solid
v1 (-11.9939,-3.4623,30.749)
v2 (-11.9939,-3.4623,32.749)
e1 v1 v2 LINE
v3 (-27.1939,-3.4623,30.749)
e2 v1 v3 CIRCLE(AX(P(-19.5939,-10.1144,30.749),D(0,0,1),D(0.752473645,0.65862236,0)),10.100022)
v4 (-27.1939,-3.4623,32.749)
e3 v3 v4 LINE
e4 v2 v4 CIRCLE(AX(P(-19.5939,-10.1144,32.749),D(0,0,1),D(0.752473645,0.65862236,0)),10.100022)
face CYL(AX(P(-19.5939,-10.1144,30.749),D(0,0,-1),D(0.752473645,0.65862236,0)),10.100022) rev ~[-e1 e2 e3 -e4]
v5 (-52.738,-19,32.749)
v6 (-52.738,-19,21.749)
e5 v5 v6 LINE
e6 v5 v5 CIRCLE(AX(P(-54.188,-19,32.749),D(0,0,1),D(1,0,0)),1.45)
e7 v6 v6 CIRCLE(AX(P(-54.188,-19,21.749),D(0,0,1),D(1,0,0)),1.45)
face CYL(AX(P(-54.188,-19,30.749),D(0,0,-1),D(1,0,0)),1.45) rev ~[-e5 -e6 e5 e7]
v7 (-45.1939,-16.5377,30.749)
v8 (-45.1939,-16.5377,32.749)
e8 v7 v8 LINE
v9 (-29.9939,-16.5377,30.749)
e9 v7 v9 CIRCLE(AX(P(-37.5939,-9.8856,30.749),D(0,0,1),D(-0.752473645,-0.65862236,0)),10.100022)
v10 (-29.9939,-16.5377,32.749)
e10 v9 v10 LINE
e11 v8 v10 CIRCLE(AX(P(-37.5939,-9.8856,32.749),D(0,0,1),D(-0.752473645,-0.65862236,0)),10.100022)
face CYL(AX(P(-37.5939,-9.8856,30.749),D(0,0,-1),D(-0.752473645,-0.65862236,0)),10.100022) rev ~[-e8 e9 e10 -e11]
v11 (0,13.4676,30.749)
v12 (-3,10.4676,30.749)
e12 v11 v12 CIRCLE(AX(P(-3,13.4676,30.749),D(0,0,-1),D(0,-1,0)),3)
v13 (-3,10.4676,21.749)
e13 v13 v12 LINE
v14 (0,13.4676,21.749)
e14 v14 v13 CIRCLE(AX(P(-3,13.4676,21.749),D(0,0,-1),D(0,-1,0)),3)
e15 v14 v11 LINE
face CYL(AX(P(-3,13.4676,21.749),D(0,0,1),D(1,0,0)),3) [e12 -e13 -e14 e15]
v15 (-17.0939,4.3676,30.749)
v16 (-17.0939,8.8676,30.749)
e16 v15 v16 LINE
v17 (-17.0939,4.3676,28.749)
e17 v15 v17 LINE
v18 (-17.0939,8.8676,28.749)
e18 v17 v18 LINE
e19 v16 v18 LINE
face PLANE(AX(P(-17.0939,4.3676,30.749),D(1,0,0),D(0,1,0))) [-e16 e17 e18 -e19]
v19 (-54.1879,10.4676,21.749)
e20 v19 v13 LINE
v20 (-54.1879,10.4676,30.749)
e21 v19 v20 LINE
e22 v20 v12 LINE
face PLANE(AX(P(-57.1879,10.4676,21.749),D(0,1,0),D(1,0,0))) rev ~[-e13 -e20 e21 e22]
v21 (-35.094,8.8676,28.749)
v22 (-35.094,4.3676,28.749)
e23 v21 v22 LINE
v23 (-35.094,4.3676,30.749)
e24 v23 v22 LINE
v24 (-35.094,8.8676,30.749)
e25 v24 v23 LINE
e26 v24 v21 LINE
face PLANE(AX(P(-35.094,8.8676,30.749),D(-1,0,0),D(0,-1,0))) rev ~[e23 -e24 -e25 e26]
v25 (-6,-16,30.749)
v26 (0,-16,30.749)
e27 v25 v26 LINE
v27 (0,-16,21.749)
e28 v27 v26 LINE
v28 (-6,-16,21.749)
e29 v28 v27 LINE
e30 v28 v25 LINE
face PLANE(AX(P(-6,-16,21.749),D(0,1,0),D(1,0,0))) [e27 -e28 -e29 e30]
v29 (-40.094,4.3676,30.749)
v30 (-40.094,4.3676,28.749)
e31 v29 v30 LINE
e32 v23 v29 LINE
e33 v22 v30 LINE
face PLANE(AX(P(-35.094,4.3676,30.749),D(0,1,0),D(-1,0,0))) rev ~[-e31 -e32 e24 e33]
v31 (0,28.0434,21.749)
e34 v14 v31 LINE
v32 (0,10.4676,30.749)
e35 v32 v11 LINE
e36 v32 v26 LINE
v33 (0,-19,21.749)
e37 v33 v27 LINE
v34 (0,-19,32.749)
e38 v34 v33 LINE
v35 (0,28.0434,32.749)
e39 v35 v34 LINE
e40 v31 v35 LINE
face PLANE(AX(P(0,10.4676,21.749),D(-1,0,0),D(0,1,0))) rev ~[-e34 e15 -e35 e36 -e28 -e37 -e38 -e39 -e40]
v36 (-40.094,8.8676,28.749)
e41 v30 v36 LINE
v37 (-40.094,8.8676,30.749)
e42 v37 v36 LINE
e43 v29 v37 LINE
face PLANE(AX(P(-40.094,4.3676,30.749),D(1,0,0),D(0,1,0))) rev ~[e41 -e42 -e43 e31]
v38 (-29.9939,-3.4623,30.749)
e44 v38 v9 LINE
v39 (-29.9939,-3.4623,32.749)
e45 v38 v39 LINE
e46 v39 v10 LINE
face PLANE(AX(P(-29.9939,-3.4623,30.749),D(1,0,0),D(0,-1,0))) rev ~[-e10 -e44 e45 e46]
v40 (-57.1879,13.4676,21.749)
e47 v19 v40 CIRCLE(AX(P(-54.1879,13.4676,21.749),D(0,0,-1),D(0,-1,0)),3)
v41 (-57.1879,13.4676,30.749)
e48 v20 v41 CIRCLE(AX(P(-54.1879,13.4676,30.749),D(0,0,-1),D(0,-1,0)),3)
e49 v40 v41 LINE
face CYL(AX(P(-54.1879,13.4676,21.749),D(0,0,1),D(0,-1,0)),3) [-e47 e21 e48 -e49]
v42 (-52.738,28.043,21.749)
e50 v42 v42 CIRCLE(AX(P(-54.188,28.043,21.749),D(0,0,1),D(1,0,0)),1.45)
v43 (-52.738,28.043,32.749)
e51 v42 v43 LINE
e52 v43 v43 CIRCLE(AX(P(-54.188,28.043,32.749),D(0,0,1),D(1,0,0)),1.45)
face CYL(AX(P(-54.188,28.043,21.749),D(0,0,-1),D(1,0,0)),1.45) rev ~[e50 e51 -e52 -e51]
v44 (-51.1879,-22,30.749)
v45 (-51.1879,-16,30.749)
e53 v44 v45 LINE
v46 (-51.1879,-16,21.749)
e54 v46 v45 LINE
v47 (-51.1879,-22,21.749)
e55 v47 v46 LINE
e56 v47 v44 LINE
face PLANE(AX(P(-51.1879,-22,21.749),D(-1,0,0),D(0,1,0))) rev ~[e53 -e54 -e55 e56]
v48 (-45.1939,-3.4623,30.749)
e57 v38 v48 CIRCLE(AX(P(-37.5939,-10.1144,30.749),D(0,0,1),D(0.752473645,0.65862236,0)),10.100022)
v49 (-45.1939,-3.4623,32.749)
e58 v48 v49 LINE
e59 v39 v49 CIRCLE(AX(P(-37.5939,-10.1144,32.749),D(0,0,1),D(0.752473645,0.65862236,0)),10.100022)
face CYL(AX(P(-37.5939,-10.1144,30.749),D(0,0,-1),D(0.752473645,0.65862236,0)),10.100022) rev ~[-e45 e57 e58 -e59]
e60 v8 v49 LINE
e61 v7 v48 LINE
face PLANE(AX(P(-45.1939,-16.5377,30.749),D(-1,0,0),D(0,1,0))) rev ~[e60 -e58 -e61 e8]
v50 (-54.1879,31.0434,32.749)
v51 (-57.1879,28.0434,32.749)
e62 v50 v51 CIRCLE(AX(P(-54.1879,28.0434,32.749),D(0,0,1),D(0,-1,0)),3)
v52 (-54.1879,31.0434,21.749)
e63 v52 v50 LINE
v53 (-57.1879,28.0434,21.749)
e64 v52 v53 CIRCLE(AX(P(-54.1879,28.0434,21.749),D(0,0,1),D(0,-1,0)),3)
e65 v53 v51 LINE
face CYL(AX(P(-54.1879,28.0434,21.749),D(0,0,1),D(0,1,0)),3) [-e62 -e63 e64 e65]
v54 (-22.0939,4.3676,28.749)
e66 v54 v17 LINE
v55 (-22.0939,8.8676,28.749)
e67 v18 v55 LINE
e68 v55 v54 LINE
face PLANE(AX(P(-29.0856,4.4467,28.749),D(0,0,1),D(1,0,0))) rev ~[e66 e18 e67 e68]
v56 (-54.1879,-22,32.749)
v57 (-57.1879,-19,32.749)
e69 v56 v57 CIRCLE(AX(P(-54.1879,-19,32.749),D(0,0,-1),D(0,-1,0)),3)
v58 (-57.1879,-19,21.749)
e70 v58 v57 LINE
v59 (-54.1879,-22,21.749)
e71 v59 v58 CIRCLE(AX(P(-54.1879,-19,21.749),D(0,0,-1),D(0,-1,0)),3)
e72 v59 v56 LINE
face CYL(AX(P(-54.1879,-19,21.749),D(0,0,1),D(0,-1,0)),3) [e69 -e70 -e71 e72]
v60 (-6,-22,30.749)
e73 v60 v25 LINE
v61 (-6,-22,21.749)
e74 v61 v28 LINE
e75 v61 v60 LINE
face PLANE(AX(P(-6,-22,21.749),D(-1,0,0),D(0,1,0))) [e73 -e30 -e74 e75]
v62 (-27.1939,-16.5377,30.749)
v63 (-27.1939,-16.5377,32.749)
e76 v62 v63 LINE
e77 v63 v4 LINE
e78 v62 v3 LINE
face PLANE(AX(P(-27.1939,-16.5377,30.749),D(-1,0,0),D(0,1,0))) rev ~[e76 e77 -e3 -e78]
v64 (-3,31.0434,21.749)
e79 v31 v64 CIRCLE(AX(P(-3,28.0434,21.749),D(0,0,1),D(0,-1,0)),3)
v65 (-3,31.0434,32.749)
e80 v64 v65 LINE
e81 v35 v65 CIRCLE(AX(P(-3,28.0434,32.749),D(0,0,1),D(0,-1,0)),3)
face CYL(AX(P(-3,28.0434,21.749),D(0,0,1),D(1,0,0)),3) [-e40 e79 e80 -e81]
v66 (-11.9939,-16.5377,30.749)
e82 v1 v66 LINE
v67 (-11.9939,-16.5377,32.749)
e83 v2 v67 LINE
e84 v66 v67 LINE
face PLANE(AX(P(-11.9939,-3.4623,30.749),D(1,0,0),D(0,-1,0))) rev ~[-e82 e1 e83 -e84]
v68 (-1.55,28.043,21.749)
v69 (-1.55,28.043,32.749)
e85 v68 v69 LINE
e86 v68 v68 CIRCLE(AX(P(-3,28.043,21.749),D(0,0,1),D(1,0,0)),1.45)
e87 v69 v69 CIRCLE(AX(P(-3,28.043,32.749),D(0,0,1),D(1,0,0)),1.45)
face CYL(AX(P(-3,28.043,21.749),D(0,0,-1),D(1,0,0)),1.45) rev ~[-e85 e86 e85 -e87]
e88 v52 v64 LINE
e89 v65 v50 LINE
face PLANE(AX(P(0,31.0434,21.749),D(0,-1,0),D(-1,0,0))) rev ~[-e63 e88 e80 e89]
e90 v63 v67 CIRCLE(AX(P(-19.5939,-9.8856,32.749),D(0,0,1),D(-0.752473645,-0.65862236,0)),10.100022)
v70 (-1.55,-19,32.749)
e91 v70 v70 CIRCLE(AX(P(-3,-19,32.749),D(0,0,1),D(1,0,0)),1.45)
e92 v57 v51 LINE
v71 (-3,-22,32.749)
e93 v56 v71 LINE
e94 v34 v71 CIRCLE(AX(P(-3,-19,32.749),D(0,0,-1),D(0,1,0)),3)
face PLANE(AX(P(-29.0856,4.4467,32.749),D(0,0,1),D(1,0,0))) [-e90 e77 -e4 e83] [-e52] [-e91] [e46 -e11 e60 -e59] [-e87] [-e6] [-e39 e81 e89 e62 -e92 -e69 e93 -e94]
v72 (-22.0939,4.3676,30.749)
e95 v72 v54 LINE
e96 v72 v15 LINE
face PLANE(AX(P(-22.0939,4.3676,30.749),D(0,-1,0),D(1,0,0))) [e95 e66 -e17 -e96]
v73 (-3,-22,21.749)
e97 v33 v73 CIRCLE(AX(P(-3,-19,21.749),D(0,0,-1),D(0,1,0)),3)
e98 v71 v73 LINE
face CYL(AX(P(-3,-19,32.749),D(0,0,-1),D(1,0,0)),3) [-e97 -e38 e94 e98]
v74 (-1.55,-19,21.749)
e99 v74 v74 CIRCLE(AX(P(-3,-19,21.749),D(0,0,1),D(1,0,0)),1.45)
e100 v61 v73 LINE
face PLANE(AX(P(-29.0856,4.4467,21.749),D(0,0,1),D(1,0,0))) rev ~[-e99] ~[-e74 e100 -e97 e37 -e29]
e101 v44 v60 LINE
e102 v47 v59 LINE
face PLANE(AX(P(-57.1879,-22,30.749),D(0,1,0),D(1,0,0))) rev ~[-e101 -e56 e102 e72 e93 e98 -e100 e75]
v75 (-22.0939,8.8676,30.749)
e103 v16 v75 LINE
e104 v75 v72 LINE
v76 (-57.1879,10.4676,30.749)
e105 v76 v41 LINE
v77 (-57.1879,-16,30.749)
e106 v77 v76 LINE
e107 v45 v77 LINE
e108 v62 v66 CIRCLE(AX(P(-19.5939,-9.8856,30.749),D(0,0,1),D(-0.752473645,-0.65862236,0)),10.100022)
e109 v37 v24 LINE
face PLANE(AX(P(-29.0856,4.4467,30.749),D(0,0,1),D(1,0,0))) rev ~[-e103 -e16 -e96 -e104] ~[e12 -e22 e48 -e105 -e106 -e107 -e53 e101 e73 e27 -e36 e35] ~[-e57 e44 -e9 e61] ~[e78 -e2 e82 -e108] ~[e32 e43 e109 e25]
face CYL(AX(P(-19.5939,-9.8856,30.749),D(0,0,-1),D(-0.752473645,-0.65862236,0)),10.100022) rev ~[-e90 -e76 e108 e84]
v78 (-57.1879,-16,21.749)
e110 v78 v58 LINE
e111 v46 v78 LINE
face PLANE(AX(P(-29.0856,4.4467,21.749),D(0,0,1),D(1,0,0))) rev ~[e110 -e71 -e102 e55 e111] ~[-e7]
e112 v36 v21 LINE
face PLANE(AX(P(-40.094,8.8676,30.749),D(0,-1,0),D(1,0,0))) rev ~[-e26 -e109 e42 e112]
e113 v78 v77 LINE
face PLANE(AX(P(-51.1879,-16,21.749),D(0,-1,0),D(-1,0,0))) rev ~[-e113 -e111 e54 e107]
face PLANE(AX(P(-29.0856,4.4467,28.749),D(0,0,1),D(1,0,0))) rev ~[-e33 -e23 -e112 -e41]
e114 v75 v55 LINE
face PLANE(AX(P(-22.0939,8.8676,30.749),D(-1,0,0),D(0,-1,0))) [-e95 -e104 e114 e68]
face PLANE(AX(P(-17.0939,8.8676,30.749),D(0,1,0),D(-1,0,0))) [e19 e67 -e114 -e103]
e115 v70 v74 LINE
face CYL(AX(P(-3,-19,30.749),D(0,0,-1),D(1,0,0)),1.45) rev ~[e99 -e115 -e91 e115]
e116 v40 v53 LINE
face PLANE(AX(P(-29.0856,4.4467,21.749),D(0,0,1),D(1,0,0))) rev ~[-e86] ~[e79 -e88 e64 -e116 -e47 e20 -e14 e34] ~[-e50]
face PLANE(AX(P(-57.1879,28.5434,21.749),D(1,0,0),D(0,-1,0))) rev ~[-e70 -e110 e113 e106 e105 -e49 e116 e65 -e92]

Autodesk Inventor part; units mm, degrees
ref_plane "YZ Plane" through (0, 0, 0) normal (1, 0, 0) x (0, 1, 0)
ref_plane "XZ Plane" through (0, 0, 0) normal (0, 1, 0) x (-1, 0, 0)
ref_plane "Work Plane1" through (-29.0856, 4.4467, 21.749) normal (0, 0, 1) x (1, 0, 0)
ref_plane "Work Plane2" through (-5, -17, 36.649) normal (0, 0, -1) x (1, 0, 0)
ref_plane "Work Plane3" through (-40.5939, -3, 26.249) normal (0, 0, -1) x (0, 1, 0)
sketch "Sketch1" plane through (-29.0856, 4.4467, 21.749) normal (0, 0, 1) x (1, 0, 0)
  arc A0 (29.0856, 24.0967) -> (26.5856, 26.5967) centre (26.5856, 24.0967) ccw projected
  line L0 (26.5856, 26.5967) -> (-25.6023, 26.5967) projected
  arc A1 (-25.6023, 26.5967) -> (-28.1023, 24.0967) centre (-25.6023, 24.0967) ccw projected
  line L1 (-28.1023, 24.0967) -> (-28.1023, -23.9467) projected
  arc A2 (-28.1023, -23.9467) -> (-25.6023, -26.4467) centre (-25.6023, -23.9467) ccw projected
  line L2 (-25.6023, -26.4467) -> (26.5856, -26.4467) projected
  line L3 (29.0856, -23.9467) -> (29.0856, 24.0967)
  circle A3 centre (26.0856, -23.4467) radius 1.45 construction
  line L4 (0.4916, -38.3665) -> (0.4916, 43.9409) construction
  line L5 (29.0856, 26.5967) -> (-28.1023, 26.5967)
  line L6 (-28.1023, 26.5967) -> (-28.1023, 6.0209)
  line L7 (-28.1023, 6.0209) -> (29.0856, 6.0209)
  line L8 (29.0856, 6.0209) -> (29.0856, 26.5967)
  line L9 (30.8116, -0.0755) -> (30.8114, -0.0755)
  line L10 (29.0856, -23.9467) -> (29.0856, -26.4467)
  line L11 (29.0856, -26.4467) -> (26.5856, -26.4467)
  line L12 (-25.6023, -26.4467) -> (-28.1023, -26.4467)
  line L13 (-28.1023, -26.4467) -> (-28.1023, -23.9467)
  circle A4 centre (26.0856, -23.4467) radius 3 construction
  circle A5 centre (26.0856, -23.4467) radius 1.45
  circle A6 centre (-25.1024, -23.4467) radius 1.45 construction
  circle A7 centre (-25.1024, -23.4467) radius 1.45
  circle A8 centre (26.0856, 23.5963) radius 1.45 construction
  circle A9 centre (26.0856, 23.5963) radius 1.45
  circle A10 centre (-25.1024, 23.5963) radius 1.45 construction
  circle A11 centre (-25.1024, 23.5963) radius 1.45
  line L14 (29.0856, -26.4467) -> (23.0856, -26.4467)
  line L15 (23.0856, -26.4467) -> (23.0856, -20.4467)
  line L16 (23.0856, -20.4467) -> (29.0856, -20.4467)
  line L17 (29.0856, -20.4467) -> (29.0856, -26.4467)
  line L18 (-28.1023, -26.4467) -> (-22.1023, -26.4467)
  line L19 (-22.1023, -26.4467) -> (-22.1023, -20.4467)
  line L20 (-22.1023, -20.4467) -> (-28.1023, -20.4467)
  line L21 (-28.1023, -20.4467) -> (-28.1023, -26.4467)
  spline S0 degree 3 poles (31.7798, -5.9724) (31.66, -5.7823) (31.4802, -5.4972) (31.2591, -5.1058) (31.1003, -4.8085) (30.9498, -4.5069) (30.8081, -4.201) (30.6761, -3.8909) (30.5547, -3.5764) (30.4456, -3.2574) (30.3497, -2.9341) (30.2872, -2.6602) (30.2421, -2.4401) (30.1945, -2.2782) (30.1301, -2.1222) (30.0461, -1.9754) (29.9577, -1.8658) (29.8777, -1.7866) (29.8102, -1.7361) (29.741, -1.6877) (29.6647, -1.6516) (29.5872, -1.6181) (29.5051, -1.5983) (29.4223, -1.5815) (29.3098, -1.5775) (29.1694, -1.5801) (29.0291, -1.5775) (28.9165, -1.5815) (28.8338, -1.5983) (28.7517, -1.6181) (28.6742, -1.6516) (28.5979, -1.6877) (28.5287, -1.7361) (28.4611, -1.7866) (28.3812, -1.8658) (28.2927, -1.9754) (28.2088, -2.1222) (28.1444, -2.2782) (28.0967, -2.4401) (28.0516, -2.6602) (27.9892, -2.9341) (27.8932, -3.2574) (27.7842, -3.5764) (27.6628, -3.8909) (27.5307, -4.201) (27.389, -4.5069) (27.2385, -4.8085) (27.0797, -5.1058) (26.8587, -5.4972) (26.6789, -5.7823) (26.559, -5.9724) knots -1.0784 -1.0784 -1.0784 -1.0784 -1.010995 -0.977291 -0.943586 -0.909882 -0.876178 -0.842474 -0.80877 -0.775067 -0.741365 -0.707665 -0.690816 -0.67397 -0.657123 -0.640284 -0.623449 -0.615023 -0.606598 -0.598176 -0.589749 -0.581327 -0.572901 -0.564477 -0.556053 -0.5392 -0.522347 -0.513923 -0.505499 -0.497074 -0.488651 -0.480225 -0.471802 -0.463377 -0.454951 -0.438116 -0.421277 -0.40443 -0.387584 -0.370735 -0.337035 -0.303333 -0.26963 -0.235926 -0.202222 -0.168518 -0.134814 -0.101109 -0.067405 0 0 0 0 construction
  line L22 (26.559, -5.9724) -> (25.4968, -5.9724) construction
  spline S1 degree 3 poles (25.4968, -5.9724) (25.377, -5.7823) (25.1972, -5.4972) (24.9761, -5.1058) (24.8173, -4.8085) (24.6668, -4.5069) (24.5251, -4.201) (24.3931, -3.8909) (24.2717, -3.5764) (24.1626, -3.2574) (24.0667, -2.9341) (24.0042, -2.6602) (23.9591, -2.4401) (23.9115, -2.2782) (23.8471, -2.1222) (23.7631, -1.9754) (23.6747, -1.8658) (23.5947, -1.7866) (23.5272, -1.7361) (23.458, -1.6877) (23.3817, -1.6516) (23.3042, -1.6181) (23.2221, -1.5983) (23.1393, -1.5815) (23.0268, -1.5775) (22.8864, -1.5801) (22.7461, -1.5775) (22.6335, -1.5815) (22.5508, -1.5983) (22.4687, -1.6181) (22.3912, -1.6516) (22.3149, -1.6877) (22.2457, -1.7361) (22.1781, -1.7866) (22.0982, -1.8658) (22.0097, -1.9754) (21.9258, -2.1222) (21.8614, -2.2782) (21.8137, -2.4401) (21.7686, -2.6602) (21.7062, -2.9341) (21.6102, -3.2574) (21.5012, -3.5764) (21.3798, -3.8909) (21.2477, -4.201) (21.106, -4.5069) (20.9555, -4.8085) (20.7967, -5.1058) (20.5757, -5.4972) (20.3959, -5.7823) (20.276, -5.9724) knots -1.0784 -1.0784 -1.0784 -1.0784 -1.010995 -0.977291 -0.943586 -0.909882 -0.876178 -0.842474 -0.80877 -0.775067 -0.741365 -0.707665 -0.690816 -0.67397 -0.657123 -0.640284 -0.623449 -0.615023 -0.606598 -0.598176 -0.589749 -0.581327 -0.572901 -0.564477 -0.556053 -0.5392 -0.522347 -0.513923 -0.505499 -0.497074 -0.488651 -0.480225 -0.471802 -0.463377 -0.454951 -0.438116 -0.421277 -0.40443 -0.387584 -0.370735 -0.337035 -0.303333 -0.26963 -0.235926 -0.202222 -0.168518 -0.134814 -0.101109 -0.067405 0 0 0 0 construction
  line L23 (20.276, -5.9724) -> (19.2138, -5.9724) construction
  spline S2 degree 3 poles (19.2138, -5.9724) (19.094, -5.7823) (18.9142, -5.4972) (18.6931, -5.1058) (18.5343, -4.8085) (18.3838, -4.5069) (18.2421, -4.201) (18.1101, -3.8909) (17.9887, -3.5764) (17.8796, -3.2574) (17.7837, -2.9341) (17.7212, -2.6602) (17.6761, -2.4401) (17.6285, -2.2782) (17.5641, -2.1222) (17.4801, -1.9754) (17.3917, -1.8658) (17.3117, -1.7866) (17.2442, -1.7361) (17.175, -1.6877) (17.0987, -1.6516) (17.0212, -1.6181) (16.9391, -1.5983) (16.8563, -1.5815) (16.7438, -1.5775) (16.6034, -1.5801) (16.4631, -1.5775) (16.3505, -1.5815) (16.2678, -1.5983) (16.1857, -1.6181) (16.1082, -1.6516) (16.0319, -1.6877) (15.9627, -1.7361) (15.8951, -1.7866) (15.8152, -1.8658) (15.7267, -1.9754) (15.6428, -2.1222) (15.5784, -2.2782) (15.5307, -2.4401) (15.4856, -2.6602) (15.4232, -2.9341) (15.3272, -3.2574) (15.2182, -3.5764) (15.0968, -3.8909) (14.9647, -4.201) (14.823, -4.5069) (14.6725, -4.8085) (14.5137, -5.1058) (14.2927, -5.4972) (14.1129, -5.7823) (13.993, -5.9724) knots -1.0784 -1.0784 -1.0784 -1.0784 -1.010995 -0.977291 -0.943586 -0.909882 -0.876178 -0.842474 -0.80877 -0.775067 -0.741365 -0.707665 -0.690816 -0.67397 -0.657123 -0.640284 -0.623449 -0.615023 -0.606598 -0.598176 -0.589749 -0.581327 -0.572901 -0.564477 -0.556053 -0.5392 -0.522347 -0.513923 -0.505499 -0.497074 -0.488651 -0.480225 -0.471802 -0.463377 -0.454951 -0.438116 -0.421277 -0.40443 -0.387584 -0.370735 -0.337035 -0.303333 -0.26963 -0.235926 -0.202222 -0.168518 -0.134814 -0.101109 -0.067405 0 0 0 0 construction
  line L24 (13.993, -5.9724) -> (12.9308, -5.9724) construction
  spline S3 degree 3 poles (12.9308, -5.9724) (12.811, -5.7823) (12.6312, -5.4972) (12.4101, -5.1058) (12.2513, -4.8085) (12.1008, -4.5069) (11.9591, -4.201) (11.8271, -3.8909) (11.7057, -3.5764) (11.5966, -3.2574) (11.5007, -2.9341) (11.4382, -2.6602) (11.3931, -2.4401) (11.3455, -2.2782) (11.2811, -2.1222) (11.1971, -1.9754) (11.1087, -1.8658) (11.0287, -1.7866) (10.9612, -1.7361) (10.892, -1.6877) (10.8157, -1.6516) (10.7382, -1.6181) (10.6561, -1.5983) (10.5733, -1.5815) (10.4608, -1.5775) (10.3204, -1.5801) (10.1801, -1.5775) (10.0675, -1.5815) (9.9848, -1.5983) (9.9027, -1.6181) (9.8252, -1.6516) (9.7489, -1.6877) (9.6797, -1.7361) (9.6121, -1.7866) (9.5322, -1.8658) (9.4437, -1.9754) (9.3598, -2.1222) (9.2954, -2.2782) (9.2477, -2.4401) (9.2026, -2.6602) (9.1402, -2.9341) (9.0442, -3.2574) (8.9352, -3.5764) (8.8138, -3.8909) (8.6817, -4.201) (8.54, -4.5069) (8.3895, -4.8085) (8.2307, -5.1058) (8.0097, -5.4972) (7.8299, -5.7823) (7.71, -5.9724) knots -1.0784 -1.0784 -1.0784 -1.0784 -1.010995 -0.977291 -0.943586 -0.909882 -0.876178 -0.842474 -0.80877 -0.775067 -0.741365 -0.707665 -0.690816 -0.67397 -0.657123 -0.640284 -0.623449 -0.615023 -0.606598 -0.598176 -0.589749 -0.581327 -0.572901 -0.564477 -0.556053 -0.5392 -0.522347 -0.513923 -0.505499 -0.497074 -0.488651 -0.480225 -0.471802 -0.463377 -0.454951 -0.438116 -0.421277 -0.40443 -0.387584 -0.370735 -0.337035 -0.303333 -0.26963 -0.235926 -0.202222 -0.168518 -0.134814 -0.101109 -0.067405 0 0 0 0 construction
  line L25 (7.71, -5.9724) -> (6.6478, -5.9724) construction
  spline S4 degree 3 poles (6.6478, -5.9724) (6.528, -5.7823) (6.3482, -5.4972) (6.1271, -5.1058) (5.9683, -4.8085) (5.8178, -4.5069) (5.6761, -4.201) (5.5441, -3.8909) (5.4227, -3.5764) (5.3136, -3.2574) (5.2177, -2.9341) (5.1552, -2.6602) (5.1101, -2.4401) (5.0625, -2.2782) (4.9981, -2.1222) (4.9141, -1.9754) (4.8257, -1.8658) (4.7457, -1.7866) (4.6782, -1.7361) (4.609, -1.6877) (4.5327, -1.6516) (4.4552, -1.6181) (4.3731, -1.5983) (4.2903, -1.5815) (4.1778, -1.5775) (4.0374, -1.5801) (3.8971, -1.5775) (3.7845, -1.5815) (3.7018, -1.5983) (3.6197, -1.6181) (3.5422, -1.6516) (3.4659, -1.6877) (3.3967, -1.7361) (3.3291, -1.7866) (3.2492, -1.8658) (3.1607, -1.9754) (3.0768, -2.1222) (3.0124, -2.2782) (2.9647, -2.4401) (2.9196, -2.6602) (2.8572, -2.9341) (2.7612, -3.2574) (2.6522, -3.5764) (2.5308, -3.8909) (2.3987, -4.201) (2.257, -4.5069) (2.1065, -4.8085) (1.9477, -5.1058) (1.7267, -5.4972) (1.5469, -5.7823) (1.427, -5.9724) knots -1.0784 -1.0784 -1.0784 -1.0784 -1.010995 -0.977291 -0.943586 -0.909882 -0.876178 -0.842474 -0.80877 -0.775067 -0.741365 -0.707665 -0.690816 -0.67397 -0.657123 -0.640284 -0.623449 -0.615023 -0.606598 -0.598176 -0.589749 -0.581327 -0.572901 -0.564477 -0.556053 -0.5392 -0.522347 -0.513923 -0.505499 -0.497074 -0.488651 -0.480225 -0.471802 -0.463377 -0.454951 -0.438116 -0.421277 -0.40443 -0.387584 -0.370735 -0.337035 -0.303333 -0.26963 -0.235926 -0.202222 -0.168518 -0.134814 -0.101109 -0.067405 0 0 0 0 construction
  line L26 (1.427, -5.9724) -> (0.3648, -5.9724) construction
  spline S5 degree 3 poles (0.3648, -5.9724) (0.245, -5.7823) (0.0652, -5.4972) (-0.1559, -5.1058) (-0.3147, -4.8085) (-0.4652, -4.5069) (-0.6069, -4.201) (-0.7389, -3.8909) (-0.8603, -3.5764) (-0.9694, -3.2574) (-1.0653, -2.9341) (-1.1278, -2.6602) (-1.1729, -2.4401) (-1.2205, -2.2782) (-1.2849, -2.1222) (-1.3689, -1.9754) (-1.4573, -1.8658) (-1.5373, -1.7866) (-1.6048, -1.7361) (-1.674, -1.6877) (-1.7503, -1.6516) (-1.8278, -1.6181) (-1.9099, -1.5983) (-1.9927, -1.5815) (-2.1052, -1.5775) (-2.2456, -1.5801) (-2.3859, -1.5775) (-2.4985, -1.5815) (-2.5812, -1.5983) (-2.6633, -1.6181) (-2.7408, -1.6516) (-2.8171, -1.6877) (-2.8863, -1.7361) (-2.9539, -1.7866) (-3.0338, -1.8658) (-3.1223, -1.9754) (-3.2062, -2.1222) (-3.2706, -2.2782) (-3.3183, -2.4401) (-3.3634, -2.6602) (-3.4258, -2.9341) (-3.5218, -3.2574) (-3.6308, -3.5764) (-3.7522, -3.8909) (-3.8843, -4.201) (-4.026, -4.5069) (-4.1765, -4.8085) (-4.3353, -5.1058) (-4.5563, -5.4972) (-4.7361, -5.7823) (-4.856, -5.9724) knots -1.0784 -1.0784 -1.0784 -1.0784 -1.010995 -0.977291 -0.943586 -0.909882 -0.876178 -0.842474 -0.80877 -0.775067 -0.741365 -0.707665 -0.690816 -0.67397 -0.657123 -0.640284 -0.623449 -0.615023 -0.606598 -0.598176 -0.589749 -0.581327 -0.572901 -0.564477 -0.556053 -0.5392 -0.522347 -0.513923 -0.505499 -0.497074 -0.488651 -0.480225 -0.471802 -0.463377 -0.454951 -0.438116 -0.421277 -0.40443 -0.387584 -0.370735 -0.337035 -0.303333 -0.26963 -0.235926 -0.202222 -0.168518 -0.134814 -0.101109 -0.067405 0 0 0 0 construction
  line L27 (-4.856, -5.9724) -> (-5.9182, -5.9724) construction
  spline S6 degree 3 poles (-5.9182, -5.9724) (-6.038, -5.7823) (-6.2178, -5.4972) (-6.4389, -5.1058) (-6.5977, -4.8085) (-6.7482, -4.5069) (-6.8899, -4.201) (-7.0219, -3.8909) (-7.1433, -3.5764) (-7.2524, -3.2574) (-7.3483, -2.9341) (-7.4108, -2.6602) (-7.4559, -2.4401) (-7.5035, -2.2782) (-7.5679, -2.1222) (-7.6519, -1.9754) (-7.7403, -1.8658) (-7.8203, -1.7866) (-7.8878, -1.7361) (-7.957, -1.6877) (-8.0333, -1.6516) (-8.1108, -1.6181) (-8.1929, -1.5983) (-8.2757, -1.5815) (-8.3882, -1.5775) (-8.5286, -1.5801) (-8.6689, -1.5775) (-8.7815, -1.5815) (-8.8642, -1.5983) (-8.9463, -1.6181) (-9.0238, -1.6516) (-9.1001, -1.6877) (-9.1693, -1.7361) (-9.2369, -1.7866) (-9.3168, -1.8658) (-9.4053, -1.9754) (-9.4892, -2.1222) (-9.5536, -2.2782) (-9.6013, -2.4401) (-9.6464, -2.6602) (-9.7088, -2.9341) (-9.8048, -3.2574) (-9.9138, -3.5764) (-10.0352, -3.8909) (-10.1673, -4.201) (-10.309, -4.5069) (-10.4595, -4.8085) (-10.6183, -5.1058) (-10.8393, -5.4972) (-11.0191, -5.7823) (-11.139, -5.9724) knots -1.0784 -1.0784 -1.0784 -1.0784 -1.010995 -0.977291 -0.943586 -0.909882 -0.876178 -0.842474 -0.80877 -0.775067 -0.741365 -0.707665 -0.690816 -0.67397 -0.657123 -0.640284 -0.623449 -0.615023 -0.606598 -0.598176 -0.589749 -0.581327 -0.572901 -0.564477 -0.556053 -0.5392 -0.522347 -0.513923 -0.505499 -0.497074 -0.488651 -0.480225 -0.471802 -0.463377 -0.454951 -0.438116 -0.421277 -0.40443 -0.387584 -0.370735 -0.337035 -0.303333 -0.26963 -0.235926 -0.202222 -0.168518 -0.134814 -0.101109 -0.067405 0 0 0 0 construction
  line L28 (-11.139, -5.9724) -> (-12.2012, -5.9724) construction
  spline S7 degree 3 poles (-12.2012, -5.9724) (-12.321, -5.7823) (-12.5008, -5.4972) (-12.7219, -5.1058) (-12.8807, -4.8085) (-13.0312, -4.5069) (-13.1729, -4.201) (-13.3049, -3.8909) (-13.4263, -3.5764) (-13.5354, -3.2574) (-13.6313, -2.9341) (-13.6938, -2.6602) (-13.7389, -2.4401) (-13.7865, -2.2782) (-13.8509, -2.1222) (-13.9349, -1.9754) (-14.0233, -1.8658) (-14.1033, -1.7866) (-14.1708, -1.7361) (-14.24, -1.6877) (-14.3163, -1.6516) (-14.3938, -1.6181) (-14.4759, -1.5983) (-14.5587, -1.5815) (-14.6712, -1.5775) (-14.8116, -1.5801) (-14.9519, -1.5775) (-15.0645, -1.5815) (-15.1472, -1.5983) (-15.2293, -1.6181) (-15.3068, -1.6516) (-15.3831, -1.6877) (-15.4523, -1.7361) (-15.5199, -1.7866) (-15.5998, -1.8658) (-15.6883, -1.9754) (-15.7722, -2.1222) (-15.8366, -2.2782) (-15.8843, -2.4401) (-15.9294, -2.6602) (-15.9918, -2.9341) (-16.0878, -3.2574) (-16.1968, -3.5764) (-16.3182, -3.8909) (-16.4503, -4.201) (-16.592, -4.5069) (-16.7425, -4.8085) (-16.9013, -5.1058) (-17.1223, -5.4972) (-17.3021, -5.7823) (-17.422, -5.9724) knots -1.0784 -1.0784 -1.0784 -1.0784 -1.010995 -0.977291 -0.943586 -0.909882 -0.876178 -0.842474 -0.80877 -0.775067 -0.741365 -0.707665 -0.690816 -0.67397 -0.657123 -0.640284 -0.623449 -0.615023 -0.606598 -0.598176 -0.589749 -0.581327 -0.572901 -0.564477 -0.556053 -0.5392 -0.522347 -0.513923 -0.505499 -0.497074 -0.488651 -0.480225 -0.471802 -0.463377 -0.454951 -0.438116 -0.421277 -0.40443 -0.387584 -0.370735 -0.337035 -0.303333 -0.26963 -0.235926 -0.202222 -0.168518 -0.134814 -0.101109 -0.067405 0 0 0 0 construction
  line L29 (-17.422, -5.9724) -> (-18.4842, -5.9724) construction
  spline S8 degree 3 poles (-18.4842, -5.9724) (-18.604, -5.7823) (-18.7838, -5.4972) (-19.0049, -5.1058) (-19.1637, -4.8085) (-19.3142, -4.5069) (-19.4559, -4.201) (-19.5879, -3.8909) (-19.7093, -3.5764) (-19.8184, -3.2574) (-19.9143, -2.9341) (-19.9768, -2.6602) (-20.0219, -2.4401) (-20.0695, -2.2782) (-20.1339, -2.1222) (-20.2179, -1.9754) (-20.3063, -1.8658) (-20.3863, -1.7866) (-20.4538, -1.7361) (-20.523, -1.6877) (-20.5993, -1.6516) (-20.6768, -1.6181) (-20.7589, -1.5983) (-20.8417, -1.5815) (-20.9542, -1.5775) (-21.0946, -1.5801) (-21.2349, -1.5775) (-21.3475, -1.5815) (-21.4302, -1.5983) (-21.5123, -1.6181) (-21.5898, -1.6516) (-21.6661, -1.6877) (-21.7353, -1.7361) (-21.8029, -1.7866) (-21.8828, -1.8658) (-21.9713, -1.9754) (-22.0552, -2.1222) (-22.1196, -2.2782) (-22.1673, -2.4401) (-22.2124, -2.6602) (-22.2748, -2.9341) (-22.3708, -3.2574) (-22.4798, -3.5764) (-22.6012, -3.8909) (-22.7333, -4.201) (-22.875, -4.5069) (-23.0255, -4.8085) (-23.1843, -5.1058) (-23.4053, -5.4972) (-23.5851, -5.7823) (-23.705, -5.9724) knots -1.0784 -1.0784 -1.0784 -1.0784 -1.010995 -0.977291 -0.943586 -0.909882 -0.876178 -0.842474 -0.80877 -0.775067 -0.741365 -0.707665 -0.690816 -0.67397 -0.657123 -0.640284 -0.623449 -0.615023 -0.606598 -0.598176 -0.589749 -0.581327 -0.572901 -0.564477 -0.556053 -0.5392 -0.522347 -0.513923 -0.505499 -0.497074 -0.488651 -0.480225 -0.471802 -0.463377 -0.454951 -0.438116 -0.421277 -0.40443 -0.387584 -0.370735 -0.337035 -0.303333 -0.26963 -0.235926 -0.202222 -0.168518 -0.134814 -0.101109 -0.067405 0 0 0 0 construction
  line L30 (-23.705, -5.9724) -> (-24.7672, -5.9724) construction
  spline S9 degree 3 poles (-24.7672, -5.9724) (-25.0203, -5.5709) (-25.5973, -4.6557) (-26.3217, -2.6647) (-26.2743, -2.3174) (-26.6017, -1.8348) (-26.7085, -1.7546) (-26.812, -1.685) (-26.9085, -1.6251) (-27.2021, -1.5665) (-27.3381, -1.5791) (-27.5882, -1.5782) (-27.6989, -1.5807) (-27.923, -1.671) (-28.0168, -1.7314) (-28.1559, -1.8474) (-28.2174, -1.9297) (-28.3263, -2.0881) (-28.3821, -2.216) (-28.4787, -2.5326) (-28.4942, -2.6936) (-28.9709, -4.4107) (-29.8122, -5.6937) (-29.988, -5.9724) knots 0 0 0 0 0.142394 0.142394 0.262557 0.262557 0.314666 0.314666 0.34653 0.34653 0.372217 0.372217 0.394622 0.394622 0.411062 0.411062 0.432958 0.432958 0.48678 0.48678 0.562983 0.562983 0.900876 0.900876 0.900876 0.900876 construction
  line L31 (-29.988, -5.9724) -> (-29.988, 5.9209) construction
  line L32 (-29.988, 5.9209) -> (31.78, 5.9209) construction
  line L33 (31.78, 5.9209) -> (31.78, -5.9724) construction
  line L34 (31.78, -5.9724) -> (31.7798, -5.9724) construction
  point P0 (19.0856, -26.4467)
  point P1 (29.0856, -16.4467)
  point P2 (-28.1023, 6.0209)
  point P3 (29.0856, 6.0209)
  point P4 (-28.1023, -20.4467)
  point P5 (-25.6023, -26.4467)
  point P6 (-22.1023, -26.4467)
  point P7 (-25.6023, 26.5967)
  point P8 (-28.1023, 24.0967)
  point P9 (23.0856, -26.4467)
  point P10 (-28.1023, 24.0967)
  point P11 (-25.6023, 26.5967)
  point P12 (-28.1023, 6.0209)
  point P13 (29.0856, 6.0209)
  dimension "d56" = 0
  dimension "d68" = 3
  dimension "d69" = 3
  dimension "d72" = 51.188
  dimension "d75" = 47.043
  dimension "d93" = 0.1
extrude "Extrusion1" add sketch "Sketch1" along normal blind 9 contours L3 L7 L1 A1 L0 A0 | A0 L5 L8 | A1 L6 L5 | L3 L10 L11 L2 L15 L16 | L20 L19 L2 A2 L1 | A2 L12 L13
sketch "Sketch4" plane through (-29.0856, 4.4467, 30.749) normal (0, 0, 1) x (1, 0, 0)
  line L0 (-28.1023, -26.4467) -> (29.0856, -26.4467) projected
  line L1 (29.0856, 26.5967) -> (-28.1023, 26.5967) projected
  line L2 (29.0856, -26.4467) -> (-28.1023, -26.4467)
  line L3 (-28.1023, -26.4467) -> (-28.1023, 26.5967)
  line L4 (-28.1023, 26.5967) -> (29.0856, 26.5967)
  line L5 (29.0856, 26.5967) -> (29.0856, -26.4467)
  line L6 (0.4916, -26.4467) -> (0.4916, 26.5967) construction
  line L7 (11.9917, 4.4209) -> (6.9917, 4.4209)
  line L8 (6.9917, 4.4209) -> (6.9917, -0.0791)
  line L9 (6.9917, -0.0791) -> (11.9917, -0.0791)
  line L10 (11.9917, -0.0791) -> (11.9917, 4.4209)
  line L11 (11.9917, 4.4209) -> (6.9917, -0.0791) construction
  line L12 (6.9917, 4.4209) -> (11.9917, -0.0791) construction
  line L13 (-11.0084, 4.4209) -> (-6.0084, 4.4209)
  line L14 (-6.0084, 4.4209) -> (-6.0084, -0.0791)
  line L15 (-6.0084, -0.0791) -> (-11.0084, -0.0791)
  line L16 (-11.0084, -0.0791) -> (-11.0084, 4.4209)
  circle A0 centre (26.0856, 23.5963) radius 1.45 projected
  circle A1 centre (26.0856, -23.4467) radius 1.45 projected
  circle A2 centre (-25.1024, -23.4467) radius 1.45 projected
  circle A3 centre (-25.1024, 23.5963) radius 1.45 projected
  line L17 (29.78, 4.9209) -> (29.78, -0.5791) construction
  line L18 (-27.988, 4.9209) -> (29.78, 4.9209) construction
  line L19 (-27.988, -0.5791) -> (-27.988, 4.9209) construction
  line L20 (29.78, -0.5791) -> (-27.988, -0.5791) construction
  arc A4 (16.9917, -7.9467) -> (1.9917, -7.9467) centre (9.4917, -14.5611) ccw construction
  line L21 (1.9917, -20.9467) -> (1.9917, -7.9467) construction
  arc A5 (1.9917, -20.9467) -> (16.9917, -20.9467) centre (9.4917, -14.3323) ccw construction
  line L22 (16.9917, -7.9467) -> (16.9917, -20.9467) construction
  arc A6 (-16.0083, -20.9467) -> (-1.0083, -20.9467) centre (-8.5083, -14.3323) ccw construction
  line L23 (-1.0083, -7.9467) -> (-1.0083, -20.9467) construction
  arc A7 (-1.0083, -7.9467) -> (-16.0083, -7.9467) centre (-8.5083, -14.5611) ccw construction
  line L24 (-16.0083, -20.9467) -> (-16.0083, -7.9467) construction
  arc A8 (1.8917, -20.9844) -> (17.0917, -20.9844) centre (9.4917, -14.3323) ccw
  line L25 (1.8917, -20.9844) -> (1.8917, -7.909)
  arc A9 (17.0917, -7.909) -> (1.8917, -7.909) centre (9.4917, -14.5611) ccw
  line L26 (17.0917, -7.909) -> (17.0917, -20.9844)
  arc A10 (-16.1083, -20.9844) -> (-0.9083, -20.9844) centre (-8.5083, -14.3323) ccw
  line L27 (-16.1083, -20.9844) -> (-16.1083, -7.909)
  arc A11 (-0.9083, -7.909) -> (-16.1083, -7.909) centre (-8.5083, -14.5611) ccw
  line L28 (-0.9083, -7.909) -> (-0.9083, -20.9844)
  point P0 (29.0856, -4.4467)
  point P1 (23.0856, -26.4467)
  point P2 (9.4917, 2.1709)
  point P3 (23.0856, -26.4467)
  dimension "d84" = 5
  dimension "d94" = 0.5
  dimension "d96" = 0.5
  dimension "d97" = 0.1
  dimension "d98" = 0.1
  dimension "d99" = 0
extrude "Extrusion6" add sketch "Sketch4" along normal blind 2 contours L3 L1 L5 L0 | L10 L9 L8 L7 | L13 L14 L15 L16
extrude "Extrusion7" add sketch "Sketch4" against normal blind 2 contours L10 L9 L8 L7 | L13 L14 L15 L16
fillet "Fillet2" radius 3 6 edges at (0, -22, 27.249) (-57.1879, -22, 27.249) (0, 31.0434, 27.249) (-57.1879, 31.0434, 27.249) (0, 10.4676, 26.249) (-57.1879, 10.4676, 26.249)
properties part number "house_V6"
